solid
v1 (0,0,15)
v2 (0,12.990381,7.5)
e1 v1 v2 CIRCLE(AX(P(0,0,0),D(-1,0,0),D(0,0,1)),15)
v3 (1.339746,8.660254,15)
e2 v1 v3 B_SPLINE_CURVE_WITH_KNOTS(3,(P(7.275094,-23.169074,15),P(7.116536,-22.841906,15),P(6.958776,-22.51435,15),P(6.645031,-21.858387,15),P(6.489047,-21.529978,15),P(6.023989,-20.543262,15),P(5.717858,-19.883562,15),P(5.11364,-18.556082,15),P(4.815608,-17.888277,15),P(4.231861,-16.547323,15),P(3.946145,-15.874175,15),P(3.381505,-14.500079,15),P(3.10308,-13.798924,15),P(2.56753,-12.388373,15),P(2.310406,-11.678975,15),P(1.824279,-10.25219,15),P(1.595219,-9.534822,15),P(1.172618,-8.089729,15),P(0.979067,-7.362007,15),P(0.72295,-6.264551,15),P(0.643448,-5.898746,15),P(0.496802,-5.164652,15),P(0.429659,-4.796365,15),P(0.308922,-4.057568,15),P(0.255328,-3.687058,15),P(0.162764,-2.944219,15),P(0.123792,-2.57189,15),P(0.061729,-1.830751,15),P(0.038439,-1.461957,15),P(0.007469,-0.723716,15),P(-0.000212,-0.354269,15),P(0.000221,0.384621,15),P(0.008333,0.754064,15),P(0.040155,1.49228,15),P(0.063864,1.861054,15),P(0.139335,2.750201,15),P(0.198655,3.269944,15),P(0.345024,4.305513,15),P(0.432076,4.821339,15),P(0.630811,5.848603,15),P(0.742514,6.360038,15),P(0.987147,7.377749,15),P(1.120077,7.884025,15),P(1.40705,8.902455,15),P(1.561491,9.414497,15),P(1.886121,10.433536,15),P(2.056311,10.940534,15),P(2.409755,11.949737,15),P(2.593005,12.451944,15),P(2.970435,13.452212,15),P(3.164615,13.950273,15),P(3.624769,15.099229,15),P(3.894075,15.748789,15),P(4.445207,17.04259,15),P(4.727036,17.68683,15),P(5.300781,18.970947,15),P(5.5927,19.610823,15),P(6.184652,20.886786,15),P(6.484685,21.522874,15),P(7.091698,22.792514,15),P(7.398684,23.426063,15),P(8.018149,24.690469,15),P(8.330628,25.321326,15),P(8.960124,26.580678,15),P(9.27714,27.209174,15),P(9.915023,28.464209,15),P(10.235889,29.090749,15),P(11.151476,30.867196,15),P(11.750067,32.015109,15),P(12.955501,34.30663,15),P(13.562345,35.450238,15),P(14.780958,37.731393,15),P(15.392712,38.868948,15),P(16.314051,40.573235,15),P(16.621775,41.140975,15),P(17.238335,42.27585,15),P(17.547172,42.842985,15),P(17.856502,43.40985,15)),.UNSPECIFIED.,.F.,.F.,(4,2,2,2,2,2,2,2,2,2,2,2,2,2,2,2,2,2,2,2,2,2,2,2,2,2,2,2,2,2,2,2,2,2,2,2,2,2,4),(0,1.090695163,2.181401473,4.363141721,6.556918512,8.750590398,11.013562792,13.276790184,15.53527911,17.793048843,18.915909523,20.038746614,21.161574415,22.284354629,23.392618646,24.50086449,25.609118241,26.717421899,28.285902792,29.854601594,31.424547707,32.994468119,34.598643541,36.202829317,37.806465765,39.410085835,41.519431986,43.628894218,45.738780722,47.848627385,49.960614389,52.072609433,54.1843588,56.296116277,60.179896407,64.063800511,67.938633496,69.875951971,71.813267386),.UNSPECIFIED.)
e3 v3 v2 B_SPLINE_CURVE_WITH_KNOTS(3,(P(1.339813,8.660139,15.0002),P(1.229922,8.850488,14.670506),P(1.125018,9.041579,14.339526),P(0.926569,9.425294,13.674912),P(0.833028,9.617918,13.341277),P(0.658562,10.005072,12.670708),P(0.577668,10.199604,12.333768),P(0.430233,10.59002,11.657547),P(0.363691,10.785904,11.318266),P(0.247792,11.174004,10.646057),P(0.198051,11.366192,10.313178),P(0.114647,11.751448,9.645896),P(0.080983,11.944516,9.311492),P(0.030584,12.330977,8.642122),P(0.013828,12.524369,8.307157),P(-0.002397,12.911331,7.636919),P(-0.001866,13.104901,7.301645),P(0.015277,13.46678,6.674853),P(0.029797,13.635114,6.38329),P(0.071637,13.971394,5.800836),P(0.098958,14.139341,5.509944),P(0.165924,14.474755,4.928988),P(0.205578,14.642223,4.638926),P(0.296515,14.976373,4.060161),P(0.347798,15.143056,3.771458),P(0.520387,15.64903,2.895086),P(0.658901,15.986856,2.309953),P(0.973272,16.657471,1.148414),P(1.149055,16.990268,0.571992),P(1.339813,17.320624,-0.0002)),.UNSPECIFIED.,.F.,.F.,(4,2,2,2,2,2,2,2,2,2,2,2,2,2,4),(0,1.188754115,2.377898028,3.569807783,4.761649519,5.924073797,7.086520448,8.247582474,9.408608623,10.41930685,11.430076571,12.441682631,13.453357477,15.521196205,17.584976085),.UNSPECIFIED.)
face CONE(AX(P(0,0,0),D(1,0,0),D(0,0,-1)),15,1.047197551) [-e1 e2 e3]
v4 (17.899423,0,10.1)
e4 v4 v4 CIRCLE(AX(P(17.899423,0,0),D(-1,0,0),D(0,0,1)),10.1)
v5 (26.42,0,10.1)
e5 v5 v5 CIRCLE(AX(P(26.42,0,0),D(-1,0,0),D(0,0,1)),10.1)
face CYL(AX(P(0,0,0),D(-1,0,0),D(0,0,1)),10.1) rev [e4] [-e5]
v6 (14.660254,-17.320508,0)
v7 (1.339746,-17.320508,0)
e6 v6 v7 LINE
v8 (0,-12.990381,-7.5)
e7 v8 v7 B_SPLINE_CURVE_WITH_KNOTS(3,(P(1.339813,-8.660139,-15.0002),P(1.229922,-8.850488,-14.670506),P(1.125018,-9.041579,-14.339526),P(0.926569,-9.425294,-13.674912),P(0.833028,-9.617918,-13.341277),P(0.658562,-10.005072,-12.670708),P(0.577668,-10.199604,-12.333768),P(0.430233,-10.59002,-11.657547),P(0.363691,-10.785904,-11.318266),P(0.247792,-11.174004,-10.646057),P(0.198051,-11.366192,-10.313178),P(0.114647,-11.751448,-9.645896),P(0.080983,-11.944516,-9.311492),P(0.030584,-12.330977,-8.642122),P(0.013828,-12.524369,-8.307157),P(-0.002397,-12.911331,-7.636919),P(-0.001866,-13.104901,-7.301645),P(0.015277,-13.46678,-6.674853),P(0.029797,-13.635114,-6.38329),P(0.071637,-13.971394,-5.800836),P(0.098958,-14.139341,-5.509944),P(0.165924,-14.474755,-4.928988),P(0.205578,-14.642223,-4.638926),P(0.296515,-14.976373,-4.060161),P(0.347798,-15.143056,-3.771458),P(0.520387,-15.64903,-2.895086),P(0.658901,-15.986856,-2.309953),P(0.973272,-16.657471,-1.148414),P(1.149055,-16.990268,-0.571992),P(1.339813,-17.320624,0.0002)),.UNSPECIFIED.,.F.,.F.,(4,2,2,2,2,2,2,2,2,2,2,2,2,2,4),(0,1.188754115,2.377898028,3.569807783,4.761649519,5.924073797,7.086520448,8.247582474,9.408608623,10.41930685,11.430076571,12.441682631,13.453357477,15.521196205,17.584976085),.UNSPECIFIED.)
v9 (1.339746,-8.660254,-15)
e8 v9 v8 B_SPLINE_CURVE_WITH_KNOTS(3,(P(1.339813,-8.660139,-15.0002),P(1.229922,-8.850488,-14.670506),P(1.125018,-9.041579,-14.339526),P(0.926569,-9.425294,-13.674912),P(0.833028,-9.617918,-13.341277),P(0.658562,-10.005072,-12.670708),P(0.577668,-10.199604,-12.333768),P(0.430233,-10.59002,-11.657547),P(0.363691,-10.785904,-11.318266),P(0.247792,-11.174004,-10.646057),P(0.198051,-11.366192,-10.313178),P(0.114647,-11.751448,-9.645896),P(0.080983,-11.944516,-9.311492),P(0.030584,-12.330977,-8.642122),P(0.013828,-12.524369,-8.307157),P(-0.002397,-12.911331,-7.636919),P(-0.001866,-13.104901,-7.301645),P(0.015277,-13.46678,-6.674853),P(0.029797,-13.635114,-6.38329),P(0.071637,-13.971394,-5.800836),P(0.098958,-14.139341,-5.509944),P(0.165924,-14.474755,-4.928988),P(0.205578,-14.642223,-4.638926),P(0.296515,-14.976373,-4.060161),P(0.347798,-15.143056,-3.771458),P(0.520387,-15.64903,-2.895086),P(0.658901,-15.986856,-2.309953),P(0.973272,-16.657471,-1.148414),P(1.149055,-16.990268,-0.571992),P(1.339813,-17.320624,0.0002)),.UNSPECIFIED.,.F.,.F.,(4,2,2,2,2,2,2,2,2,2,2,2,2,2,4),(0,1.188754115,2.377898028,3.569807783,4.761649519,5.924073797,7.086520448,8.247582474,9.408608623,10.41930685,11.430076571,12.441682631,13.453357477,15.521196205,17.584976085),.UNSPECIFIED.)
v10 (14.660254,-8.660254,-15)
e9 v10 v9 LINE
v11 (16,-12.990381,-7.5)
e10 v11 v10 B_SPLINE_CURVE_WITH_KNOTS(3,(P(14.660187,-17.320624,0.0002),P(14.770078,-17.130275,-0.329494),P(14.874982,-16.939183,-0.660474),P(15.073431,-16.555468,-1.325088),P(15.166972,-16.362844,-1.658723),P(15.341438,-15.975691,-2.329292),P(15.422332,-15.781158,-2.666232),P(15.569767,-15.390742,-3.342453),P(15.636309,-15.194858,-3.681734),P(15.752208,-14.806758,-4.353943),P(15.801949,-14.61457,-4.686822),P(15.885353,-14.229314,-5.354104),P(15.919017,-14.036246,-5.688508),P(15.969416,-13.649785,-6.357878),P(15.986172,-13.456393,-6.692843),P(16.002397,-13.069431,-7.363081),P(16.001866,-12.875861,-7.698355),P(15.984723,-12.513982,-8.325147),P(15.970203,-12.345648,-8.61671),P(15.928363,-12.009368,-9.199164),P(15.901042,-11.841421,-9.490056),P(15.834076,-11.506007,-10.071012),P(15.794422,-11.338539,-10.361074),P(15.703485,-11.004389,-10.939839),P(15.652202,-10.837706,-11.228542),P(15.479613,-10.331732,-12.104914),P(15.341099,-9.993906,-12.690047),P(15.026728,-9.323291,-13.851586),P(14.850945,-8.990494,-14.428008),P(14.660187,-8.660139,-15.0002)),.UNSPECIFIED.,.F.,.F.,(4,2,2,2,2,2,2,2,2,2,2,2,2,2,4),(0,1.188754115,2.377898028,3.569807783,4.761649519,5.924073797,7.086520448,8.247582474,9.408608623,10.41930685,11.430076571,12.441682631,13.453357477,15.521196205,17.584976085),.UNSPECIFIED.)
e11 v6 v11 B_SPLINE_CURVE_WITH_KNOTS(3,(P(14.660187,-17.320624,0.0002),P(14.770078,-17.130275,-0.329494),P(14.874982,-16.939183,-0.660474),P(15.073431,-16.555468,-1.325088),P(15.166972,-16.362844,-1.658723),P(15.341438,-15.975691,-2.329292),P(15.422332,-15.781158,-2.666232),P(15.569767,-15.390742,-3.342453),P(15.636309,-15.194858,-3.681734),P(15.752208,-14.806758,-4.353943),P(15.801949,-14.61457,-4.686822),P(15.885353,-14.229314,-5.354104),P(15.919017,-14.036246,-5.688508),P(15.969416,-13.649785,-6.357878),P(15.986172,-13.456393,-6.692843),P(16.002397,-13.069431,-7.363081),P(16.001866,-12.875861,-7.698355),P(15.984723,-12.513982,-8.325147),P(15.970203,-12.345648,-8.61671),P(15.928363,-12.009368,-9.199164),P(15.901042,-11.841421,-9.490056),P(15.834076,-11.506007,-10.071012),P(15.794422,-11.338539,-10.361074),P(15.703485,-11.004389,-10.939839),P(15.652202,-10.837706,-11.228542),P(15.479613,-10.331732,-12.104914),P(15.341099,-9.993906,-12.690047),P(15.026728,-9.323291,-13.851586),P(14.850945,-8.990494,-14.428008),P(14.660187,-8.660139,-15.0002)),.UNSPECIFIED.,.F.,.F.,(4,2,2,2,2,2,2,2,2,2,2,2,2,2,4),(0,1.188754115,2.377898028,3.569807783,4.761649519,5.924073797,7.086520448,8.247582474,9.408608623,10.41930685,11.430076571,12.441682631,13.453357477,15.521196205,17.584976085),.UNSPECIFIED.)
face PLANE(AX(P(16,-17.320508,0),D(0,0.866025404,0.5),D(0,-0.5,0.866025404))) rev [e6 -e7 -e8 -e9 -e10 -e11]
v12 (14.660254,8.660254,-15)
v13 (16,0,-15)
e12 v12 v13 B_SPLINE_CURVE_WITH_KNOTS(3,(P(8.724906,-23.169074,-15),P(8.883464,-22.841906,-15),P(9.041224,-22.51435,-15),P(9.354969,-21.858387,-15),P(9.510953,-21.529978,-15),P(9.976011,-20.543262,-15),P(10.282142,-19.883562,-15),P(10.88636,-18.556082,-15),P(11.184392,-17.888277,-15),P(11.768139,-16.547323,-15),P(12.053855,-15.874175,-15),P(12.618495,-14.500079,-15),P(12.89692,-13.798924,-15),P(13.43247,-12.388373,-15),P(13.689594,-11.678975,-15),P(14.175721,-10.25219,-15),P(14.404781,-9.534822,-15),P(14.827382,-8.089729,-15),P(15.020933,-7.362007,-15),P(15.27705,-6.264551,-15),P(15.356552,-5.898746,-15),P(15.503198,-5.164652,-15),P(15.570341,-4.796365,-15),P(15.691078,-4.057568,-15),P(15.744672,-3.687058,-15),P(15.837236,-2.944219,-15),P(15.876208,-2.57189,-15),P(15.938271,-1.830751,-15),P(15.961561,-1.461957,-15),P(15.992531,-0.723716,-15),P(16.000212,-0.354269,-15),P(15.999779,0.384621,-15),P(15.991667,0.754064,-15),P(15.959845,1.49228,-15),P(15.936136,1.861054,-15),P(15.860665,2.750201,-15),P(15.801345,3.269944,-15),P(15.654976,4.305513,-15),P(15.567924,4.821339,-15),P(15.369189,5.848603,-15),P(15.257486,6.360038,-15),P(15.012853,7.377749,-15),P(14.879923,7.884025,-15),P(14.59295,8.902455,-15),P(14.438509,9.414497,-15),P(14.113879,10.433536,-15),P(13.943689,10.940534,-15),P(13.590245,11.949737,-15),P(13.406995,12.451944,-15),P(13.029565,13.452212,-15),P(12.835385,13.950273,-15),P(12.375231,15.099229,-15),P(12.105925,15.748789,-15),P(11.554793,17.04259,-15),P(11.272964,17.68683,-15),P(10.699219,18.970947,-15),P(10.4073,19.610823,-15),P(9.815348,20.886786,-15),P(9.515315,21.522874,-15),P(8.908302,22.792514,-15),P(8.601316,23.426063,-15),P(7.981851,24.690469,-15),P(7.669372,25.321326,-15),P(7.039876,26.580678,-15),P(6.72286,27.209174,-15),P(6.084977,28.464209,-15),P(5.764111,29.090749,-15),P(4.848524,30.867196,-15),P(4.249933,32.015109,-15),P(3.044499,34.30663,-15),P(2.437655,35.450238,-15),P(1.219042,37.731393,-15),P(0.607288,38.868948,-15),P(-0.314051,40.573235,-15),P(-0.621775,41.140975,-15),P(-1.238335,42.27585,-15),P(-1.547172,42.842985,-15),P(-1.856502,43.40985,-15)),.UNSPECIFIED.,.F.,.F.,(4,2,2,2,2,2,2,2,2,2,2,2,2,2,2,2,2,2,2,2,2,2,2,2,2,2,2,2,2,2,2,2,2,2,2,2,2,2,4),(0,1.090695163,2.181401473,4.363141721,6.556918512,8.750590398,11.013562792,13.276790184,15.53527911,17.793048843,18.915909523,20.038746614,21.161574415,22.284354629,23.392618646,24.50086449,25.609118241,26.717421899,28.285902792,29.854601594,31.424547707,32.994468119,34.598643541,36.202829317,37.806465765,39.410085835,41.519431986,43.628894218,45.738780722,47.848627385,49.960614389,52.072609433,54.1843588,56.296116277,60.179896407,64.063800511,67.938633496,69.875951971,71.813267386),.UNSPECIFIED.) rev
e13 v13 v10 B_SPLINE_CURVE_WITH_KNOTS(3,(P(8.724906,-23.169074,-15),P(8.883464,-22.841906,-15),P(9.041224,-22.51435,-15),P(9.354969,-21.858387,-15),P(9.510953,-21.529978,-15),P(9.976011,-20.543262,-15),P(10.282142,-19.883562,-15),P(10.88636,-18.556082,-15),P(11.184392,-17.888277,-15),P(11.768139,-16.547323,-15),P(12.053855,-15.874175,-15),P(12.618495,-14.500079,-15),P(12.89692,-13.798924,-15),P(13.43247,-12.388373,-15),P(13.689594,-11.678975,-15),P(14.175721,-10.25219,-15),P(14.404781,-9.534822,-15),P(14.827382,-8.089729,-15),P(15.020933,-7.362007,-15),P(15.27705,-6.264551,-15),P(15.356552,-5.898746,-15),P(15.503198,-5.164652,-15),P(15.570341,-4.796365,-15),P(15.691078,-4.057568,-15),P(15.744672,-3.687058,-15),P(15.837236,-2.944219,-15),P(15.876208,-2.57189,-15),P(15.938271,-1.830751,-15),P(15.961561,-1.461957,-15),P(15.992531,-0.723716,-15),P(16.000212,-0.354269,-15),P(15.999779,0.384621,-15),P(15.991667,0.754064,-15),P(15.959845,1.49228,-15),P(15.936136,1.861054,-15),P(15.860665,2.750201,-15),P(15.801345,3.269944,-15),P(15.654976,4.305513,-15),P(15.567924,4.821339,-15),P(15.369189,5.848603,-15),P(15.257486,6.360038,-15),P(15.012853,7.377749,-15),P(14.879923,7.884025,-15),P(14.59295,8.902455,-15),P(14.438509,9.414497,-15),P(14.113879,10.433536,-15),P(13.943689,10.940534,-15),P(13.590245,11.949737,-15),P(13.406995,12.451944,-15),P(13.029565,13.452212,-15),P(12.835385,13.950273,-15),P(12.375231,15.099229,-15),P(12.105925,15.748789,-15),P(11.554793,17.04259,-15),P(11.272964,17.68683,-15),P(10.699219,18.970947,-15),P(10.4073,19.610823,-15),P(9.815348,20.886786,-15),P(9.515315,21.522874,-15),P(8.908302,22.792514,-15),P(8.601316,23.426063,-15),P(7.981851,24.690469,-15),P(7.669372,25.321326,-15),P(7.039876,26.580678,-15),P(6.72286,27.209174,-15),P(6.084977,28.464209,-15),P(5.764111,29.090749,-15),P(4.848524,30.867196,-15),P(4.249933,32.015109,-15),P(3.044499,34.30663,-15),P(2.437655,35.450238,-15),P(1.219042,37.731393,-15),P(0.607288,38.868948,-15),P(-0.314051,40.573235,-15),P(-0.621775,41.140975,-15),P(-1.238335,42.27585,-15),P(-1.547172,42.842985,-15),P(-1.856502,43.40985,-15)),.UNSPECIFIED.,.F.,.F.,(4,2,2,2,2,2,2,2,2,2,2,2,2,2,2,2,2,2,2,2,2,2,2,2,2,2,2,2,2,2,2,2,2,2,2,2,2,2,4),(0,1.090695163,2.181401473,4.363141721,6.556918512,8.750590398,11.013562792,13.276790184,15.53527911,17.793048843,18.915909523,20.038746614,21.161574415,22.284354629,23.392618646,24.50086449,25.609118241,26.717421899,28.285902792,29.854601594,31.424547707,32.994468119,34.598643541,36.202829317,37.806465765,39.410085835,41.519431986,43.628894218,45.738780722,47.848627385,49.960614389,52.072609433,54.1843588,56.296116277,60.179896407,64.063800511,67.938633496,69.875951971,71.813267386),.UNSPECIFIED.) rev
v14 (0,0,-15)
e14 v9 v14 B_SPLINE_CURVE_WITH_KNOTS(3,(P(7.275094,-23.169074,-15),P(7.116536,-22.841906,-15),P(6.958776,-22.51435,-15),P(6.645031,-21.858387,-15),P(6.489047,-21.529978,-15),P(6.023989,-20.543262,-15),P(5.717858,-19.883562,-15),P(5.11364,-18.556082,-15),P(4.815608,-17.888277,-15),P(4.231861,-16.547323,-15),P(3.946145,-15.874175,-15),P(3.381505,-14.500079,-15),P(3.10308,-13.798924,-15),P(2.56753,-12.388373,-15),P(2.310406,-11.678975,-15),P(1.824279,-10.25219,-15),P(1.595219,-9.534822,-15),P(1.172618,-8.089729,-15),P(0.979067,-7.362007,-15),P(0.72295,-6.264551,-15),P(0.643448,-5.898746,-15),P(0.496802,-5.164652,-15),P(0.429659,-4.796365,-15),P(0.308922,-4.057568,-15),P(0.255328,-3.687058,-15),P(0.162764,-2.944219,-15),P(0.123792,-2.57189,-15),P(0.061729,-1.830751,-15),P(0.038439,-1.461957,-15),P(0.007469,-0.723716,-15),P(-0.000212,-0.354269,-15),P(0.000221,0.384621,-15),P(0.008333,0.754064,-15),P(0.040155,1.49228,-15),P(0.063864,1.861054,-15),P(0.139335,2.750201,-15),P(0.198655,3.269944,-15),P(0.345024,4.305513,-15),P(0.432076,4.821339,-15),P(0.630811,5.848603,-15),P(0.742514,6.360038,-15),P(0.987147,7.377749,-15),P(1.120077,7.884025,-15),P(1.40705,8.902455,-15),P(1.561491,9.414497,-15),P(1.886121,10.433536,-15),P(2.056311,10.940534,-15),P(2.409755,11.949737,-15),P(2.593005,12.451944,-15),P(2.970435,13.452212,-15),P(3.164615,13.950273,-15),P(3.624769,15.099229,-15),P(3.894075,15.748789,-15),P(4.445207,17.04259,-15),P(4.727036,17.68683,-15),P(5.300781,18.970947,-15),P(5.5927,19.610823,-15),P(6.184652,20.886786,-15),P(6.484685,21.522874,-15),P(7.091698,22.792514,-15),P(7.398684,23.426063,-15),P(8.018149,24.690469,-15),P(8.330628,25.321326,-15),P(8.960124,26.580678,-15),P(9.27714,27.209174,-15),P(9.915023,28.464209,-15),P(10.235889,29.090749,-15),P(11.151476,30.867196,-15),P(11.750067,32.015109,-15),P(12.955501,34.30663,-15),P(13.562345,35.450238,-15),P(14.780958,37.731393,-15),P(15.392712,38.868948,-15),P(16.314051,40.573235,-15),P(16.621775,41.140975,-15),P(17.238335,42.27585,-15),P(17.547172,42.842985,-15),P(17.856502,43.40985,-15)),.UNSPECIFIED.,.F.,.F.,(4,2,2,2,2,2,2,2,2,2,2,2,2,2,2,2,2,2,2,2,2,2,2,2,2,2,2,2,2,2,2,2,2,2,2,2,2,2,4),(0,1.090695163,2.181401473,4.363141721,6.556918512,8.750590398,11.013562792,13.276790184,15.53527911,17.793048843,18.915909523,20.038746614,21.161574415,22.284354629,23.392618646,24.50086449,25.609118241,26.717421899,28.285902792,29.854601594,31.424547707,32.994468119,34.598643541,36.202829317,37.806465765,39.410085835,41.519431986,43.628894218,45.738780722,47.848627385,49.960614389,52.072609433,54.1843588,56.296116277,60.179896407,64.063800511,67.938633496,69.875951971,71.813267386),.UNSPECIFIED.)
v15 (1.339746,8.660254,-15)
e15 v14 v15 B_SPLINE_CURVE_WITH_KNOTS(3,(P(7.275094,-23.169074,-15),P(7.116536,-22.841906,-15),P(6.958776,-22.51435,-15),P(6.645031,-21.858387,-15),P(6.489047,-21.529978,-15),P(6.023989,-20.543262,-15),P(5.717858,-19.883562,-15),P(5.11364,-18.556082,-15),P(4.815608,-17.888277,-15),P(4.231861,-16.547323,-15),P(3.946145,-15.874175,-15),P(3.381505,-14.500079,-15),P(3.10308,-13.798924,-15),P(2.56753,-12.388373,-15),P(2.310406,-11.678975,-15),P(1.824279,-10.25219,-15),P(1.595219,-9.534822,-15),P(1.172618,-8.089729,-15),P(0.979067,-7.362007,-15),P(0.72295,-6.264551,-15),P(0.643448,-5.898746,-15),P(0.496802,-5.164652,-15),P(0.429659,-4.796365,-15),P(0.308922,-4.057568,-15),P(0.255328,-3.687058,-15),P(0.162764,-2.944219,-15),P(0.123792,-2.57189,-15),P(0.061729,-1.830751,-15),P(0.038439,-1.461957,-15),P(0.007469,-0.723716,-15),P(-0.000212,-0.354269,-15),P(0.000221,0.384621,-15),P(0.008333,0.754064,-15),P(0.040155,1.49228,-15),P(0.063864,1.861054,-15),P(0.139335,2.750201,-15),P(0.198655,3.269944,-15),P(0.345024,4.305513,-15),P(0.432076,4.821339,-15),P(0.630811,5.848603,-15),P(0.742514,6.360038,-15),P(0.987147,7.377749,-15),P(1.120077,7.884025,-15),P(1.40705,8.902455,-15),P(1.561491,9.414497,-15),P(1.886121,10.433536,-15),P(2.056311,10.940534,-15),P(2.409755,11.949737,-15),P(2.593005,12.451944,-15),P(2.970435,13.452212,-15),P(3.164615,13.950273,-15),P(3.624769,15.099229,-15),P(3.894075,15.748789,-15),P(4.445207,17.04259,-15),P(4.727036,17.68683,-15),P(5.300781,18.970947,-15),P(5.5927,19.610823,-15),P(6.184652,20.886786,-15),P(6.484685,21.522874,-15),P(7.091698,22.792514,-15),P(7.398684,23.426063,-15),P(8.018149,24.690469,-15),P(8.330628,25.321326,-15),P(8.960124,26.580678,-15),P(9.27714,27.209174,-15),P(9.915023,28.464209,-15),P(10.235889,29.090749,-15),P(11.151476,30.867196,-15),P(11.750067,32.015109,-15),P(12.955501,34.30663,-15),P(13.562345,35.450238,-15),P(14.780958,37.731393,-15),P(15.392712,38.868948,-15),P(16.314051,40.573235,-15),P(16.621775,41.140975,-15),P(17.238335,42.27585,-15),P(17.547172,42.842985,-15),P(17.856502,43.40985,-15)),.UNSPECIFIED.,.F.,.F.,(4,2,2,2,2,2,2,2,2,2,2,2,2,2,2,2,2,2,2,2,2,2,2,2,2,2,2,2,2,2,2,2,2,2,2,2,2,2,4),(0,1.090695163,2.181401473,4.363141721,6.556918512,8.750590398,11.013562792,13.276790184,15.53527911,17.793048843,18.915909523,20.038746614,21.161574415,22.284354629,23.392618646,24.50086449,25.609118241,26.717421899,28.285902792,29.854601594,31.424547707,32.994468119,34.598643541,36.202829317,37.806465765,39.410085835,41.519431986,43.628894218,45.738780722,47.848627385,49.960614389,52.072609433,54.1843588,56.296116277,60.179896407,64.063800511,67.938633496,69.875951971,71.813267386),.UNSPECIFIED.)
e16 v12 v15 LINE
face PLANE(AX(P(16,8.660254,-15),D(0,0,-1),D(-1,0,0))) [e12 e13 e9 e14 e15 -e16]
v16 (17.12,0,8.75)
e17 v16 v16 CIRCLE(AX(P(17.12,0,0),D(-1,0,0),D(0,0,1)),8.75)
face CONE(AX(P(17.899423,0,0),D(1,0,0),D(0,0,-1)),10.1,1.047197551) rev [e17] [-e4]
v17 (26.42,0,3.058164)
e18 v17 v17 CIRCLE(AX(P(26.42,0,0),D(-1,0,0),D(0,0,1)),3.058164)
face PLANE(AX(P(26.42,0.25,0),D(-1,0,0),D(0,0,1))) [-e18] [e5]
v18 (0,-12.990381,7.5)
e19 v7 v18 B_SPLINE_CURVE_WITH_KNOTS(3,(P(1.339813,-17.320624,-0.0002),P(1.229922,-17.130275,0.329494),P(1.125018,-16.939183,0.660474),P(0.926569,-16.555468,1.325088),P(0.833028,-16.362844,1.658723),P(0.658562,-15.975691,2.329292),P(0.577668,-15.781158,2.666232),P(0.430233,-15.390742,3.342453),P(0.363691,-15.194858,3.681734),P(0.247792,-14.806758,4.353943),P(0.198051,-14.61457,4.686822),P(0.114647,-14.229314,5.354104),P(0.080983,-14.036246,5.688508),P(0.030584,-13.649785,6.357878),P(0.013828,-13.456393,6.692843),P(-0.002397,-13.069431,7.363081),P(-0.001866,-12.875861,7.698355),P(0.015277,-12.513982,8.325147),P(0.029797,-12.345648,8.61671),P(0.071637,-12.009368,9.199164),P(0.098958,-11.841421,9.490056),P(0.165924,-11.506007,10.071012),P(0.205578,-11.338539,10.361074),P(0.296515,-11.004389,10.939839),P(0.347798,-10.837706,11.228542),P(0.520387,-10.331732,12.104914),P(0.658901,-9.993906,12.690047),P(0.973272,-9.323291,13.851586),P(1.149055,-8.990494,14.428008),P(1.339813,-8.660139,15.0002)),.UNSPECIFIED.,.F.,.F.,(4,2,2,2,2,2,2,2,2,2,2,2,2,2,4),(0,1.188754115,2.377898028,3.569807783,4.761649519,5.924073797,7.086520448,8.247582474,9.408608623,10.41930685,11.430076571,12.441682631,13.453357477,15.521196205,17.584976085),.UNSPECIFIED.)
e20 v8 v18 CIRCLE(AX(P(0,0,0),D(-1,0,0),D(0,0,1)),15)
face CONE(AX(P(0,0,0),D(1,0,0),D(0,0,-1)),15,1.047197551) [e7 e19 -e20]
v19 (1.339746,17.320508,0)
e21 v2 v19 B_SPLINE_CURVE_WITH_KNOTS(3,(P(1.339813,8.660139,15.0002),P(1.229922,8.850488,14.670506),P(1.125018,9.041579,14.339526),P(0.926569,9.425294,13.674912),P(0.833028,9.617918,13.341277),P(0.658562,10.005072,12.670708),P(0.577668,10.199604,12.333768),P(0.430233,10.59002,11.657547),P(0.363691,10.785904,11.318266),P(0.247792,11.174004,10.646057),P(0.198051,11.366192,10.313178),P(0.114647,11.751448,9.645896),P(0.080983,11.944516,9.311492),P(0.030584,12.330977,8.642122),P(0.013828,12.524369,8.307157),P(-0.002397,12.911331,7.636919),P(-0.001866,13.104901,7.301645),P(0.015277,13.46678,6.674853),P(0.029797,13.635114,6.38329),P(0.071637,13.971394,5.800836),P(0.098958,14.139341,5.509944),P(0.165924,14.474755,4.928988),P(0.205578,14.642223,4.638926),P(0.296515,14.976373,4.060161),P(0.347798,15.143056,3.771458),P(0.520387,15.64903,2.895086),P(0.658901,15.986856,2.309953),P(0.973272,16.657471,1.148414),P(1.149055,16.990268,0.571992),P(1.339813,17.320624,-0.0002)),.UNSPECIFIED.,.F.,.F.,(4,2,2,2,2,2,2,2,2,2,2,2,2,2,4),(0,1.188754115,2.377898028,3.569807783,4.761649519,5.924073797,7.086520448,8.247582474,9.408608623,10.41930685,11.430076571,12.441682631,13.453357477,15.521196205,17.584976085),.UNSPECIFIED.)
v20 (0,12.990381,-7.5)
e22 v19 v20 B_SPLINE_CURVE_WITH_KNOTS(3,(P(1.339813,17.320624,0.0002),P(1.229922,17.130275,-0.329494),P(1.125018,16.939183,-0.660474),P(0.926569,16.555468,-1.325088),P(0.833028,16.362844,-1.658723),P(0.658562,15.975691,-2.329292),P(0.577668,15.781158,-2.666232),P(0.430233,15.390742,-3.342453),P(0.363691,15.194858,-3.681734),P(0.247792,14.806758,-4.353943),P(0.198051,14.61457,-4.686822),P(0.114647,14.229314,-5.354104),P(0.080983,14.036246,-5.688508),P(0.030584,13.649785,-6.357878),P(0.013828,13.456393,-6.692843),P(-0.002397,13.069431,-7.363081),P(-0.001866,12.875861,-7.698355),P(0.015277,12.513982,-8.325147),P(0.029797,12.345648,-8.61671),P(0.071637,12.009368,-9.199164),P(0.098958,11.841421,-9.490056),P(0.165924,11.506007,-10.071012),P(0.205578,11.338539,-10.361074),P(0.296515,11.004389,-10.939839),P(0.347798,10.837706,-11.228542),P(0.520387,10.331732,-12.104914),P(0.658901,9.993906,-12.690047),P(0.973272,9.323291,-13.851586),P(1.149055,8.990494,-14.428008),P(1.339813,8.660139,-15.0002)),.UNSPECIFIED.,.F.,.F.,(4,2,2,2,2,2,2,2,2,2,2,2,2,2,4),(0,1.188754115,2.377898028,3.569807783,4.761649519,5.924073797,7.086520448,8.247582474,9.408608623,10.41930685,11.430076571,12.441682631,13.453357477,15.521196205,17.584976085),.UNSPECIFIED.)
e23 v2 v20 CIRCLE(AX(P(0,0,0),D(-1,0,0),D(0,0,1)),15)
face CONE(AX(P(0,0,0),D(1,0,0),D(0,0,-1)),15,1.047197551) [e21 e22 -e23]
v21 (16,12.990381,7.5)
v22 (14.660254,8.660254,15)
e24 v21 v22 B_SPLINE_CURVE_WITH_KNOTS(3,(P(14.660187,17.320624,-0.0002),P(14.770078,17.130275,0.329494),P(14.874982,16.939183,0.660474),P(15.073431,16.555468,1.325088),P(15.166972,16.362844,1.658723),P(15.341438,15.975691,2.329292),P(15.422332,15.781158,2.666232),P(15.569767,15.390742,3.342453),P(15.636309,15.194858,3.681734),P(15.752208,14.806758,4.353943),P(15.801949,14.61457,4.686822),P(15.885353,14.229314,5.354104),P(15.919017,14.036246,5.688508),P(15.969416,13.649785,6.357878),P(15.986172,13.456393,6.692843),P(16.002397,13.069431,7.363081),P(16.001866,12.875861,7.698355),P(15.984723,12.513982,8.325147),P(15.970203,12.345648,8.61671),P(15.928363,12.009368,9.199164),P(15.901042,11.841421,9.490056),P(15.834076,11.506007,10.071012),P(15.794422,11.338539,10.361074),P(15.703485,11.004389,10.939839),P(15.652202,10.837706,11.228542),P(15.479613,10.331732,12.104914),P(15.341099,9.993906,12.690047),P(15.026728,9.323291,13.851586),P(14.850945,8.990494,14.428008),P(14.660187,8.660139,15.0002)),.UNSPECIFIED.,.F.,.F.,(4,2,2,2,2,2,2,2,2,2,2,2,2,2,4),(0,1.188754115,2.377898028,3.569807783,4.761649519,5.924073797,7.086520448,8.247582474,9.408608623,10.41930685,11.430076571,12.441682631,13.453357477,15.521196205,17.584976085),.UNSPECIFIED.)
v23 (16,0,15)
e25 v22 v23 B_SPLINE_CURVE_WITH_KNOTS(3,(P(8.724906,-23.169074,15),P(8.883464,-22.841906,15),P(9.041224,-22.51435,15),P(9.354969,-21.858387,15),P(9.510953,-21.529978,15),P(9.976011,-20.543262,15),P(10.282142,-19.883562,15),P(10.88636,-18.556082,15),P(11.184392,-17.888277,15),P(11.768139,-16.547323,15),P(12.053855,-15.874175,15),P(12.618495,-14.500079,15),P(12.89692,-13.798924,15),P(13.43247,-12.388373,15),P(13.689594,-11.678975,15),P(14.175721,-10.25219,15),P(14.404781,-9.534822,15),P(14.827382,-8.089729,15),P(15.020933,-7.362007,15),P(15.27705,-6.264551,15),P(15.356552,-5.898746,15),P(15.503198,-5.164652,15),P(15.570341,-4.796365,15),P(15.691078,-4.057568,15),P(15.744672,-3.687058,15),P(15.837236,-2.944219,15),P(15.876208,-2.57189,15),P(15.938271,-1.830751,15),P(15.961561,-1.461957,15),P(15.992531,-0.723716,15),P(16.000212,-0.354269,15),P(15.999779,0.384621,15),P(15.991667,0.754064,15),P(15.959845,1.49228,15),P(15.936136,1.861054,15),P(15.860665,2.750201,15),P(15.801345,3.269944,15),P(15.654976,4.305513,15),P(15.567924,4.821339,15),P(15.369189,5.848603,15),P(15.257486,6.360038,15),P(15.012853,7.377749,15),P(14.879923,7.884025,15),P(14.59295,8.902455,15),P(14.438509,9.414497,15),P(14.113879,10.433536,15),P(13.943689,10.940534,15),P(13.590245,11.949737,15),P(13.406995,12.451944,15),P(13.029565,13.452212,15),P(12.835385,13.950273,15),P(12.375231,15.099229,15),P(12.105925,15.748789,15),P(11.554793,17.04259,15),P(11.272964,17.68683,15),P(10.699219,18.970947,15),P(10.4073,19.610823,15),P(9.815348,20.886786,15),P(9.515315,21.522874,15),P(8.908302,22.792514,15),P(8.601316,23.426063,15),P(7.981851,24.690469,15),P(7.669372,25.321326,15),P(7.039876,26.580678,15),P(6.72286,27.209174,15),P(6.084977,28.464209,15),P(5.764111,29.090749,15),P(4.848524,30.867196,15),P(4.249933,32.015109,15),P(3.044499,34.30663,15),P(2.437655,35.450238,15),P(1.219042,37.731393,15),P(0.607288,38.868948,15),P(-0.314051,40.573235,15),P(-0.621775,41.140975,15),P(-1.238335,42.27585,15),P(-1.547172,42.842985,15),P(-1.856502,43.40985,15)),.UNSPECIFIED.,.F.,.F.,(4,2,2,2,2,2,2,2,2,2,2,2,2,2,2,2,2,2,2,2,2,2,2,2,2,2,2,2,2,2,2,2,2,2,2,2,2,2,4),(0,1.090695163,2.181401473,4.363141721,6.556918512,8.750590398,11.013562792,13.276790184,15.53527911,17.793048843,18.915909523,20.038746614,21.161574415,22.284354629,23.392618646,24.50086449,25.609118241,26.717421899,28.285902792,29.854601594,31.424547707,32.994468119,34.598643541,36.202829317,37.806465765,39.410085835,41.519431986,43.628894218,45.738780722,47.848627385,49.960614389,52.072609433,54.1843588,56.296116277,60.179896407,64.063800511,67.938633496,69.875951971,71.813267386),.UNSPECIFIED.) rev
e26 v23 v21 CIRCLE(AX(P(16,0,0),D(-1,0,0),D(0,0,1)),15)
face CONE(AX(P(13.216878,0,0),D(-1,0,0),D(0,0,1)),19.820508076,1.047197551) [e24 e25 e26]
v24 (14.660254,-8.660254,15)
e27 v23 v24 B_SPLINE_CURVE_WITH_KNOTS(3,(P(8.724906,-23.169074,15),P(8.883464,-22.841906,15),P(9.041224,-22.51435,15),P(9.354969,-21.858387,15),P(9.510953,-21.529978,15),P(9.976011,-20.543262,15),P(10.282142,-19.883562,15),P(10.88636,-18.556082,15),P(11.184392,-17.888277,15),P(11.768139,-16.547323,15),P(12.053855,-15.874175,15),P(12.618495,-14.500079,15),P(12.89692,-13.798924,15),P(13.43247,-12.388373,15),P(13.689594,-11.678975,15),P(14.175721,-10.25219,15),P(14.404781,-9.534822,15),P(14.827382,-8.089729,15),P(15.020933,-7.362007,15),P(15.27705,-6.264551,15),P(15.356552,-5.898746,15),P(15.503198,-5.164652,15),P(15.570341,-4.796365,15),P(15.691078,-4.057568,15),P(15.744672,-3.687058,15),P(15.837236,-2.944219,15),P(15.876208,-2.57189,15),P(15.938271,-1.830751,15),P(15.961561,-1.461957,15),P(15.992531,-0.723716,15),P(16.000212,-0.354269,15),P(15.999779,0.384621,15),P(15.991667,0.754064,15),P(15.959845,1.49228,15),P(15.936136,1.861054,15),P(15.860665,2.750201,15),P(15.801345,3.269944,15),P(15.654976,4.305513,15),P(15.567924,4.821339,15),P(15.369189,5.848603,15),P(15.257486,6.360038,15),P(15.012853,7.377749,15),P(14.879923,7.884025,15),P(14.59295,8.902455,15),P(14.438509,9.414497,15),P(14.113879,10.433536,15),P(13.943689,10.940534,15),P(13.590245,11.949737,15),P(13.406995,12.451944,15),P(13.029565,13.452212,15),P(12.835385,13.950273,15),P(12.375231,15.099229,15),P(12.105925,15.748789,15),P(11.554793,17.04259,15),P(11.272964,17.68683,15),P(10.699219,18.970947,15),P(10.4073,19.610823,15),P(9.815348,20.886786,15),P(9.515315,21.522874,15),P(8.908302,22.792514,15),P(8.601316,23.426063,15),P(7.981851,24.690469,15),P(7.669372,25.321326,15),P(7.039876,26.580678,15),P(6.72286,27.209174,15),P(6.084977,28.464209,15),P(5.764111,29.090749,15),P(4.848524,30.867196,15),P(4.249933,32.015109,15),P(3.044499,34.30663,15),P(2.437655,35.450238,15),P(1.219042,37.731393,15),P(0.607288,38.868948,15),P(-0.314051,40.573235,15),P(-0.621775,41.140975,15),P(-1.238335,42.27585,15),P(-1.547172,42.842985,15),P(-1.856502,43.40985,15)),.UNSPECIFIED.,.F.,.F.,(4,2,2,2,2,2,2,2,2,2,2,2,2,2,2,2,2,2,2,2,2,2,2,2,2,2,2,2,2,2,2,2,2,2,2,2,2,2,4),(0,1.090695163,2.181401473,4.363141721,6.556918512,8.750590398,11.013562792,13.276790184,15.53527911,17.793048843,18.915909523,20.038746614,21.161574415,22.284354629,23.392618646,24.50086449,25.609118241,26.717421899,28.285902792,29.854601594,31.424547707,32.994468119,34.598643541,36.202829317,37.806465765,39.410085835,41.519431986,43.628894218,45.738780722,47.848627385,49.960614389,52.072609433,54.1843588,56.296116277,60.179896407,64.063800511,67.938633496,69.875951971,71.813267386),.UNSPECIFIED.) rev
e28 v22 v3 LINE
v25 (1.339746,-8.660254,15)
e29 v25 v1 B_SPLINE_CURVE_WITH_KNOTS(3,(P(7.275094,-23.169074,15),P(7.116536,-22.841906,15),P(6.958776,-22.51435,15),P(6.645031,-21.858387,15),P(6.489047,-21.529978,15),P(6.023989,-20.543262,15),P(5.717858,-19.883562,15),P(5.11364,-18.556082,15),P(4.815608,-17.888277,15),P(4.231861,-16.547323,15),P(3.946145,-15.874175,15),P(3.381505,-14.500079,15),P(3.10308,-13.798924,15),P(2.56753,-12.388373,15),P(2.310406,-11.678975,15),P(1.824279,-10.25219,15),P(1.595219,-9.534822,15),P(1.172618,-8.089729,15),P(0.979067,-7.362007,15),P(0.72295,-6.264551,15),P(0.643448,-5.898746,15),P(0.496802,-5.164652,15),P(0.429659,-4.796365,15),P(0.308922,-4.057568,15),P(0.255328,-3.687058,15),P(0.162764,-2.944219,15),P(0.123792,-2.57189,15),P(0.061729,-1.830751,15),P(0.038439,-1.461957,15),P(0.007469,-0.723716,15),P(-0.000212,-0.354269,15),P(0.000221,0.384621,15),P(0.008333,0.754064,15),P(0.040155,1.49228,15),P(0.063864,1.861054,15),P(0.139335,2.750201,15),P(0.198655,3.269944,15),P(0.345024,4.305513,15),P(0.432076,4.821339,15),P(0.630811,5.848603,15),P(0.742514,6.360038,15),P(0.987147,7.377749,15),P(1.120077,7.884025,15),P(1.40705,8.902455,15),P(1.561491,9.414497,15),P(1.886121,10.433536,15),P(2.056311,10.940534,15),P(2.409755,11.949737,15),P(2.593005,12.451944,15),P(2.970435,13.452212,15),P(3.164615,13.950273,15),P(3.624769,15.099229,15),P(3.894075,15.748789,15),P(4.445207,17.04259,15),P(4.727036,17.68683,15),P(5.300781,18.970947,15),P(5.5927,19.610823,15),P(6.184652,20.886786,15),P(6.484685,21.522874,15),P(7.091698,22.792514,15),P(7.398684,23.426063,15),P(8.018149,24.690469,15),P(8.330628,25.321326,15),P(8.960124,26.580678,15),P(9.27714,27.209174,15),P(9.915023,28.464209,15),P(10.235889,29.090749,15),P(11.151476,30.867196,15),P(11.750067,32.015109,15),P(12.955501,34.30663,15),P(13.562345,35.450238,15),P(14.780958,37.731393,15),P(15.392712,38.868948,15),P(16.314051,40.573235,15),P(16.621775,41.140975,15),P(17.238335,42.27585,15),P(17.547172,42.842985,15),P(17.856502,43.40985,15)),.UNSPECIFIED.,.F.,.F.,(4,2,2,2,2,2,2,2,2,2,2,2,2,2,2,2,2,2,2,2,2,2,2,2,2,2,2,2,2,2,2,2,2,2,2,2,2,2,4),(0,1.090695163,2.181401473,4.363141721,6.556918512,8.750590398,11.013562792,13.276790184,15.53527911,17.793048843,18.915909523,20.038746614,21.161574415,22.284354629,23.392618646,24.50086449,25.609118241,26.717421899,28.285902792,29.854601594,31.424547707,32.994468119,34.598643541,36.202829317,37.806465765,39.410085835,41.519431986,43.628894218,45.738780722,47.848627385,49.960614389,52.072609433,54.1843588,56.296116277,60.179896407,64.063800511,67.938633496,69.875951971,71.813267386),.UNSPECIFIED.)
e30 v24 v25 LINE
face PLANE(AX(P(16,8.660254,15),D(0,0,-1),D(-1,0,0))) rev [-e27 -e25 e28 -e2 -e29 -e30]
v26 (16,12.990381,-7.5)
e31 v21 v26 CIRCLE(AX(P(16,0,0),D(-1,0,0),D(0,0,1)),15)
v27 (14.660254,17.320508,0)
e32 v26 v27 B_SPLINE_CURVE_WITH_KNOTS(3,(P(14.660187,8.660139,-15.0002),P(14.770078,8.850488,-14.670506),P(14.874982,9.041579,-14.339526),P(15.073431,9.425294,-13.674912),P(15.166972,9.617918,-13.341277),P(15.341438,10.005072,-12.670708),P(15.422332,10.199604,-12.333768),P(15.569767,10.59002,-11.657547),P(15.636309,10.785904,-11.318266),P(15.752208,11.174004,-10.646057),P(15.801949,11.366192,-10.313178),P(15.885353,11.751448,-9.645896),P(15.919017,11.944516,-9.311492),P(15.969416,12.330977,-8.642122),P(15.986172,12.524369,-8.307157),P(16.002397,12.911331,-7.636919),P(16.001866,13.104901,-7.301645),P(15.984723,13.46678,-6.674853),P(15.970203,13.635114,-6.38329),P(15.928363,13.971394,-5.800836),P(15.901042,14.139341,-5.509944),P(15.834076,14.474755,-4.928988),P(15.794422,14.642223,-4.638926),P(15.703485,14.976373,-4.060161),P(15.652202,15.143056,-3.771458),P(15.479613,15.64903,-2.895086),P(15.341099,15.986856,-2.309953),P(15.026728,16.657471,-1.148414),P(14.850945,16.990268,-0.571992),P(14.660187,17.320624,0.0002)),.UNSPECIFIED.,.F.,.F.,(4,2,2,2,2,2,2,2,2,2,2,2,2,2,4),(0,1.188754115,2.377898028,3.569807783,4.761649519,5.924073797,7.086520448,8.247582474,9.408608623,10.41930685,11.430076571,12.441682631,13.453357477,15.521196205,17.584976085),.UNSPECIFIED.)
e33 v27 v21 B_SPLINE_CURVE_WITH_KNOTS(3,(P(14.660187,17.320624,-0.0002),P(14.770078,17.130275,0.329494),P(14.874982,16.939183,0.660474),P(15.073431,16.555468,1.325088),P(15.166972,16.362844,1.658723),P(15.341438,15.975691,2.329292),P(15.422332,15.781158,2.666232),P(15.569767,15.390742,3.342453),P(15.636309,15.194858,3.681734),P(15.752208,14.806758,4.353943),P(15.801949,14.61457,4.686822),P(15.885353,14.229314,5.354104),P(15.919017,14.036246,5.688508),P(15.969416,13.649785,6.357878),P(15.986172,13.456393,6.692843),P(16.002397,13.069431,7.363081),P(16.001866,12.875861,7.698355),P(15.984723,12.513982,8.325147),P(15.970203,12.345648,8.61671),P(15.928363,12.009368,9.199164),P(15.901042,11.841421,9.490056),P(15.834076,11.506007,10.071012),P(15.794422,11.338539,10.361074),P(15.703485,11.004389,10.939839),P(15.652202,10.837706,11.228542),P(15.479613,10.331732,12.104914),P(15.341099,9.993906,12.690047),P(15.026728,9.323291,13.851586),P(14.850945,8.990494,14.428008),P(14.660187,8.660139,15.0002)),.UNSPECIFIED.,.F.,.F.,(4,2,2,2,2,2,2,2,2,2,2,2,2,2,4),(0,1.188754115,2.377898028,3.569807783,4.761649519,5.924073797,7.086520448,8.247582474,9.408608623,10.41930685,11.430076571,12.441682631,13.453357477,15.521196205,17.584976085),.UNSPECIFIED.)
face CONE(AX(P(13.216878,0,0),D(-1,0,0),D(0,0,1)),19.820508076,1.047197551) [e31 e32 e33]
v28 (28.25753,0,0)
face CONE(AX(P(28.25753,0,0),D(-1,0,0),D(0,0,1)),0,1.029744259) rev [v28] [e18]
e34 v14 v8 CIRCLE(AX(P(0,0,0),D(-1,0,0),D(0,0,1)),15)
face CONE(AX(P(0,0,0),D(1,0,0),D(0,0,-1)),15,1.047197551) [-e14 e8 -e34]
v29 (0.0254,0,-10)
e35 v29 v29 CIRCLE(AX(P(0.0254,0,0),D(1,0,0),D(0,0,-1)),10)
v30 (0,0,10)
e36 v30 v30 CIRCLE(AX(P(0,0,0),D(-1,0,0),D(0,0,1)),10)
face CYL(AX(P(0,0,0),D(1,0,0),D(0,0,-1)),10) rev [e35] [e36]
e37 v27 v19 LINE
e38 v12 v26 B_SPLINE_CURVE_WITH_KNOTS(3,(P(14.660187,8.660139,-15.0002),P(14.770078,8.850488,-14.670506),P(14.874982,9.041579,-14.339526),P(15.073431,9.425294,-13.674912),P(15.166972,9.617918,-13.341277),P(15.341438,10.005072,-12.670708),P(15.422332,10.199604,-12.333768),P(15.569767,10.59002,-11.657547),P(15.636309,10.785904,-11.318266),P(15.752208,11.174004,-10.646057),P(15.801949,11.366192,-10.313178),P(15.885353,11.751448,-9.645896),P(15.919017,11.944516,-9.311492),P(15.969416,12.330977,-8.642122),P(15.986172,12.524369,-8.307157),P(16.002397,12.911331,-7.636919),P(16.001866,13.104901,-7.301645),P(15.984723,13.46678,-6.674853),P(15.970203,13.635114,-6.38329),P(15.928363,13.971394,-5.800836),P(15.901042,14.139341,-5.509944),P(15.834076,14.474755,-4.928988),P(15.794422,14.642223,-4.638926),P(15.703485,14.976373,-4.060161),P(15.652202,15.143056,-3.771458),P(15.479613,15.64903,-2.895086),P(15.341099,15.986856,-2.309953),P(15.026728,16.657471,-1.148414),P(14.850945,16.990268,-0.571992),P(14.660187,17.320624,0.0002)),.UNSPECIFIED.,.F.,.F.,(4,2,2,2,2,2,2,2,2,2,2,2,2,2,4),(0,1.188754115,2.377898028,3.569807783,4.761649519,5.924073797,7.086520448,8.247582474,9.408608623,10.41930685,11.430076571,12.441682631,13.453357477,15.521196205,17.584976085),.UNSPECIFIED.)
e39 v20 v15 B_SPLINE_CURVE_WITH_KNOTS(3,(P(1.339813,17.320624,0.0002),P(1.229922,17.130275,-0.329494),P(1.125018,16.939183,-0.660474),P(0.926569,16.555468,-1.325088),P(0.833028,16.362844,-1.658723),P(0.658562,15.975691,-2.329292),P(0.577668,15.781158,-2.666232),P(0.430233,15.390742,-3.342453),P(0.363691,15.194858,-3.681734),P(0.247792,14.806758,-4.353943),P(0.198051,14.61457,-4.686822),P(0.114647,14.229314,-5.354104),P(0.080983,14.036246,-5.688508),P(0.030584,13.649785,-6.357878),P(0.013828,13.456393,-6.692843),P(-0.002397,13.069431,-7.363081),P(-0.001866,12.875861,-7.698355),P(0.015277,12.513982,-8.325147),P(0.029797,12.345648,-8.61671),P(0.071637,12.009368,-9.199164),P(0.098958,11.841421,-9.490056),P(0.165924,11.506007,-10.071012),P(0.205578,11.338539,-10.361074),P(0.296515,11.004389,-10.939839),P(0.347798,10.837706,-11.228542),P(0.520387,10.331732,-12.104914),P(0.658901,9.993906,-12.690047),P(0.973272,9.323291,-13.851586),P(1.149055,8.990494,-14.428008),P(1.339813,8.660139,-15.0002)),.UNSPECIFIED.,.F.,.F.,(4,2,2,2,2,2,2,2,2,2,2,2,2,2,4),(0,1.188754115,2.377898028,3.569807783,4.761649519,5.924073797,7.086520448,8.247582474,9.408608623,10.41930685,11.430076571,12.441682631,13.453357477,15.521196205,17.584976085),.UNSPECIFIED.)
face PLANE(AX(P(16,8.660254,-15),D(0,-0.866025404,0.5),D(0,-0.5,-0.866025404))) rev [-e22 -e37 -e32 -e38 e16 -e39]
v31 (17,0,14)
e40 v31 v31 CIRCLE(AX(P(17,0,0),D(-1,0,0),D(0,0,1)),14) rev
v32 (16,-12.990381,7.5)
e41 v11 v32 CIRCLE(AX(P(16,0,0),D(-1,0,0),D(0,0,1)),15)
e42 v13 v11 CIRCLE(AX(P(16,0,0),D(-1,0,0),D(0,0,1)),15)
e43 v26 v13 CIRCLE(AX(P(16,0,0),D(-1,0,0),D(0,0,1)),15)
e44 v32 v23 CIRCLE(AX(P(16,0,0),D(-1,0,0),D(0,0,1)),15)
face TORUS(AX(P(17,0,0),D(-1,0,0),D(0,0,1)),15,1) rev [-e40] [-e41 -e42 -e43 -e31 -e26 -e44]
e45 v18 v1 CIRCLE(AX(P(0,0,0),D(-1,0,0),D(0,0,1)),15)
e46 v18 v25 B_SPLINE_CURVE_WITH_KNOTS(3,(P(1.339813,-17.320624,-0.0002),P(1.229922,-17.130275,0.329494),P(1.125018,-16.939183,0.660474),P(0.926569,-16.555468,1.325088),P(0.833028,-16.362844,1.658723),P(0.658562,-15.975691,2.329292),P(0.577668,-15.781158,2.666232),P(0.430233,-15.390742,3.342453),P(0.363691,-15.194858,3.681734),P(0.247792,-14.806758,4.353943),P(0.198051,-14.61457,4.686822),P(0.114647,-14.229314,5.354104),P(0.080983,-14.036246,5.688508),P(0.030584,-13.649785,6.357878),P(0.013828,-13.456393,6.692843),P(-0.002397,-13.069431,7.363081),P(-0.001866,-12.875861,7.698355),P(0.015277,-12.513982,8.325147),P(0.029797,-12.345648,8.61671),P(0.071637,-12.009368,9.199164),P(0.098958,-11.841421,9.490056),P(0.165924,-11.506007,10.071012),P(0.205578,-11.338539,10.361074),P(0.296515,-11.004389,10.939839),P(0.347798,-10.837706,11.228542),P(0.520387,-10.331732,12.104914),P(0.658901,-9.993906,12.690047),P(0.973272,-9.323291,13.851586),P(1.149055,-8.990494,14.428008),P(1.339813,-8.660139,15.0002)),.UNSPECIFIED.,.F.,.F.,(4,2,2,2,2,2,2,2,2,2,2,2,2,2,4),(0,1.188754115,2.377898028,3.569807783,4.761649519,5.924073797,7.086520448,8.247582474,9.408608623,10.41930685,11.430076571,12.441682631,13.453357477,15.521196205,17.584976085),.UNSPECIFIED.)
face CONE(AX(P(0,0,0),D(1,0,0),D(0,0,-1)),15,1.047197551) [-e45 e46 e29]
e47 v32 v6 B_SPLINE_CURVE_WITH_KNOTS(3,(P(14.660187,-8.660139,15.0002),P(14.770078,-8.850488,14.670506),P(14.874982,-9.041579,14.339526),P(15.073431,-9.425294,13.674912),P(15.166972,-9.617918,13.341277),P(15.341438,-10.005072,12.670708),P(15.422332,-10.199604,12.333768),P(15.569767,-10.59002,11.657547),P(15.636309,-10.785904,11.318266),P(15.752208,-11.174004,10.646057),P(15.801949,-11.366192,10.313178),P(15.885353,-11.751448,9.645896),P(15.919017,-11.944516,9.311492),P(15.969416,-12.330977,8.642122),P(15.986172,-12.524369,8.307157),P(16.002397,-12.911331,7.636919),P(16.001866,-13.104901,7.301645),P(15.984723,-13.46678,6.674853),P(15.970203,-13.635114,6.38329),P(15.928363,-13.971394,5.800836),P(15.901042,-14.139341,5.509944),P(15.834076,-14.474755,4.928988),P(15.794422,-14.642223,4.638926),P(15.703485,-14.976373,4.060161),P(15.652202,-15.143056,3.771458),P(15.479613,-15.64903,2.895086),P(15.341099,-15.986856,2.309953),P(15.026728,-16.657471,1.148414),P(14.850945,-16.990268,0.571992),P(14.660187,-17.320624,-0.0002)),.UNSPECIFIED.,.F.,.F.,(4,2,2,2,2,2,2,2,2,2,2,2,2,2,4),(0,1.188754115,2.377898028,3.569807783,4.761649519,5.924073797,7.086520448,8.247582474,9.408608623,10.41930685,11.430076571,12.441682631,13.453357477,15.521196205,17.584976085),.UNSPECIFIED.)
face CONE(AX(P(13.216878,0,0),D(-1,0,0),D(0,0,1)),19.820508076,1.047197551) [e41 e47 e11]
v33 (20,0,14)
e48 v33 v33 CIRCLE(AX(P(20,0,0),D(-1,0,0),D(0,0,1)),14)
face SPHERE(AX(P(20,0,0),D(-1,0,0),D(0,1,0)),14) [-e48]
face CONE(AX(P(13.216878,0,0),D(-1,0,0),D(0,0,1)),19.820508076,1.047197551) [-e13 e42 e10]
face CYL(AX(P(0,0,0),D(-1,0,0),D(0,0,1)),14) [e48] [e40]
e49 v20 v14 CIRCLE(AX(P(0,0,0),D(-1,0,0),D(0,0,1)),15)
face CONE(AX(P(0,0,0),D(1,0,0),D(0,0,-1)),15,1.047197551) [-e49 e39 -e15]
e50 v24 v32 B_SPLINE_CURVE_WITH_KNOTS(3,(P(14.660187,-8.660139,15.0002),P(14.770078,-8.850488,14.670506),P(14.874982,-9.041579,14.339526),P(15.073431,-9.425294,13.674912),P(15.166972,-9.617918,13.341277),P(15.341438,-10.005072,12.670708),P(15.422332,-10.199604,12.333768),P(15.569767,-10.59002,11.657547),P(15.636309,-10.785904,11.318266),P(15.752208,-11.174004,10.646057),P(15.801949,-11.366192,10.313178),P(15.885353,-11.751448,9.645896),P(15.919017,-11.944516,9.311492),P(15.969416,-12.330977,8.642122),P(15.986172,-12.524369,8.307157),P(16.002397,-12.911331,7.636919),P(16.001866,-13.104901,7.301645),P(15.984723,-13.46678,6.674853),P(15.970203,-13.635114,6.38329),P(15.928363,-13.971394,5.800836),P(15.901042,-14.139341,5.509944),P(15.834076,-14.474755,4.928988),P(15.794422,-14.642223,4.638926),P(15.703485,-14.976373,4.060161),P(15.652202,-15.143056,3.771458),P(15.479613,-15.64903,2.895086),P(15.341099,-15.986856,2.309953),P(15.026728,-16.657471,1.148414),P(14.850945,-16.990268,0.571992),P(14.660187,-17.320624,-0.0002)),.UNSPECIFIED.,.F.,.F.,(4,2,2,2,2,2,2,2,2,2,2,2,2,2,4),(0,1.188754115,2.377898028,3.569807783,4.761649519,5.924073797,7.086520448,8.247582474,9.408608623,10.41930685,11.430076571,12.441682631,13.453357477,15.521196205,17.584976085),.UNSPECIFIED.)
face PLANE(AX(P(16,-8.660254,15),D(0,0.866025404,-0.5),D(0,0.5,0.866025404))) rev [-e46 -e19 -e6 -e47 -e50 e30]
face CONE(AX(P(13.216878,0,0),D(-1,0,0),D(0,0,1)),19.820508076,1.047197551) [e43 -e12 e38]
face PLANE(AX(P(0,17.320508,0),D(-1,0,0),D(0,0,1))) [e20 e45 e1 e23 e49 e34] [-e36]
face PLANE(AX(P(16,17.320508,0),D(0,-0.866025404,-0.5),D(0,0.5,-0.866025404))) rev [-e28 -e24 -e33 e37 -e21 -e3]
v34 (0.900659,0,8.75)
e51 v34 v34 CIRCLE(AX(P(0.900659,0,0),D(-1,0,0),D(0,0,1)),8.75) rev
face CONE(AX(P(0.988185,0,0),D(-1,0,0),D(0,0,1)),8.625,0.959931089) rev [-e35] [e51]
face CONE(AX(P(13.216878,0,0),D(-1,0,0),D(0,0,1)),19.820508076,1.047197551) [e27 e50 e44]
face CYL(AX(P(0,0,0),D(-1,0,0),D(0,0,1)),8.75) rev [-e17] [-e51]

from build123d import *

# Parameters (mm, degrees)
BASENUT_DEPTH = 16
DOMEFILLET_R  = 1


with BuildPart() as part:
    # BaseNutSke → BaseNut (new body)
    with BuildSketch(Plane(origin=(0, 0, 0), x_dir=(0, 0, -1), z_dir=(1, 0, 0))):
        Polygon((15, 8.660254038), (15, -8.660254038), (0, -17.320508076), (-15, -8.660254038), (-15, 8.660254038), (0, 17.320508076), align=None)
    extrude(amount=BASENUT_DEPTH)

    # DomeSke → Dome (revolve)
    with BuildSketch(Plane.XY, mode=Mode.PRIVATE) as dome_sk:
        with BuildLine():
            Line((34, 0), (0, 0))
            Line((0, 0), (0, 14))
            Line((0, 14), (20, 14))
            ThreePointArc((20, 14), (29.899494937, 9.899494937), (34, 0))
        make_face()
    revolve(dome_sk.sketch.rotate(Axis((0, 0, 0), (1, 0, 0)), 90), axis=Axis((0, 0, 0), (1, 0, 0)))

    # Sketch4 → DoubleChamfer (revolve, cut)
    with BuildSketch(Plane.XY):
        Polygon((0, 15), (2.783121635, 19.820508076), (13.216878365, 19.820508076), (16, 15), (18, 15), (18, 30), (-2, 30), (-2, 15), align=None)
    revolve(axis=Axis((0, 0, 0), (1, 0, 0)), mode=Mode.SUBTRACT)

    # TapDriSke → TapDrill (revolve, cut)
    with BuildSketch(Plane.XY, mode=Mode.PRIVATE) as tapdrill_sk:
        Polygon((0, 8.75), (23, 8.75), (28.257530416, 0), (0, 0), align=None)
    revolve(tapdrill_sk.sketch.rotate(Axis((0, 0, 0), (1, 0, 0)), 90), axis=Axis((0, 0, 0), (1, 0, 0)), mode=Mode.SUBTRACT)

    # UcutSke → Undercut (revolve, cut)
    with BuildSketch(Plane.XY, mode=Mode.PRIVATE) as undercut_sk:
        Polygon((17.899422863, 10.1), (17.12, 8.75), (17.12, 0.25), (26.42, 0.25), (26.42, 10.1), align=None)
    revolve(undercut_sk.sketch.rotate(Axis((0, 0, 0), (1, 0, 0)), 90), axis=Axis((0, 0, 0), (1, 0, 0)), mode=Mode.SUBTRACT)

    # EndChamferSketch → EndChamfer (revolve, cut)
    with BuildSketch(Plane.XY):
        Polygon((-0.0254, 10), (0.0254, 10), (0.988185365, 8.625), (-0.0254, 8.625), align=None)
    revolve(axis=Axis((0, 0, 0), (-1, 0, 0)), mode=Mode.SUBTRACT)

    # DomeFillet
    domefillet_edges = [part.edges().sort_by_distance(p)[0] for p in [
        (16, 0, -14),
    ]]
    fillet(domefillet_edges, radius=DOMEFILLET_R - 0.0001)  # a hair under: the kernel refuses the full size


solid = part.part
